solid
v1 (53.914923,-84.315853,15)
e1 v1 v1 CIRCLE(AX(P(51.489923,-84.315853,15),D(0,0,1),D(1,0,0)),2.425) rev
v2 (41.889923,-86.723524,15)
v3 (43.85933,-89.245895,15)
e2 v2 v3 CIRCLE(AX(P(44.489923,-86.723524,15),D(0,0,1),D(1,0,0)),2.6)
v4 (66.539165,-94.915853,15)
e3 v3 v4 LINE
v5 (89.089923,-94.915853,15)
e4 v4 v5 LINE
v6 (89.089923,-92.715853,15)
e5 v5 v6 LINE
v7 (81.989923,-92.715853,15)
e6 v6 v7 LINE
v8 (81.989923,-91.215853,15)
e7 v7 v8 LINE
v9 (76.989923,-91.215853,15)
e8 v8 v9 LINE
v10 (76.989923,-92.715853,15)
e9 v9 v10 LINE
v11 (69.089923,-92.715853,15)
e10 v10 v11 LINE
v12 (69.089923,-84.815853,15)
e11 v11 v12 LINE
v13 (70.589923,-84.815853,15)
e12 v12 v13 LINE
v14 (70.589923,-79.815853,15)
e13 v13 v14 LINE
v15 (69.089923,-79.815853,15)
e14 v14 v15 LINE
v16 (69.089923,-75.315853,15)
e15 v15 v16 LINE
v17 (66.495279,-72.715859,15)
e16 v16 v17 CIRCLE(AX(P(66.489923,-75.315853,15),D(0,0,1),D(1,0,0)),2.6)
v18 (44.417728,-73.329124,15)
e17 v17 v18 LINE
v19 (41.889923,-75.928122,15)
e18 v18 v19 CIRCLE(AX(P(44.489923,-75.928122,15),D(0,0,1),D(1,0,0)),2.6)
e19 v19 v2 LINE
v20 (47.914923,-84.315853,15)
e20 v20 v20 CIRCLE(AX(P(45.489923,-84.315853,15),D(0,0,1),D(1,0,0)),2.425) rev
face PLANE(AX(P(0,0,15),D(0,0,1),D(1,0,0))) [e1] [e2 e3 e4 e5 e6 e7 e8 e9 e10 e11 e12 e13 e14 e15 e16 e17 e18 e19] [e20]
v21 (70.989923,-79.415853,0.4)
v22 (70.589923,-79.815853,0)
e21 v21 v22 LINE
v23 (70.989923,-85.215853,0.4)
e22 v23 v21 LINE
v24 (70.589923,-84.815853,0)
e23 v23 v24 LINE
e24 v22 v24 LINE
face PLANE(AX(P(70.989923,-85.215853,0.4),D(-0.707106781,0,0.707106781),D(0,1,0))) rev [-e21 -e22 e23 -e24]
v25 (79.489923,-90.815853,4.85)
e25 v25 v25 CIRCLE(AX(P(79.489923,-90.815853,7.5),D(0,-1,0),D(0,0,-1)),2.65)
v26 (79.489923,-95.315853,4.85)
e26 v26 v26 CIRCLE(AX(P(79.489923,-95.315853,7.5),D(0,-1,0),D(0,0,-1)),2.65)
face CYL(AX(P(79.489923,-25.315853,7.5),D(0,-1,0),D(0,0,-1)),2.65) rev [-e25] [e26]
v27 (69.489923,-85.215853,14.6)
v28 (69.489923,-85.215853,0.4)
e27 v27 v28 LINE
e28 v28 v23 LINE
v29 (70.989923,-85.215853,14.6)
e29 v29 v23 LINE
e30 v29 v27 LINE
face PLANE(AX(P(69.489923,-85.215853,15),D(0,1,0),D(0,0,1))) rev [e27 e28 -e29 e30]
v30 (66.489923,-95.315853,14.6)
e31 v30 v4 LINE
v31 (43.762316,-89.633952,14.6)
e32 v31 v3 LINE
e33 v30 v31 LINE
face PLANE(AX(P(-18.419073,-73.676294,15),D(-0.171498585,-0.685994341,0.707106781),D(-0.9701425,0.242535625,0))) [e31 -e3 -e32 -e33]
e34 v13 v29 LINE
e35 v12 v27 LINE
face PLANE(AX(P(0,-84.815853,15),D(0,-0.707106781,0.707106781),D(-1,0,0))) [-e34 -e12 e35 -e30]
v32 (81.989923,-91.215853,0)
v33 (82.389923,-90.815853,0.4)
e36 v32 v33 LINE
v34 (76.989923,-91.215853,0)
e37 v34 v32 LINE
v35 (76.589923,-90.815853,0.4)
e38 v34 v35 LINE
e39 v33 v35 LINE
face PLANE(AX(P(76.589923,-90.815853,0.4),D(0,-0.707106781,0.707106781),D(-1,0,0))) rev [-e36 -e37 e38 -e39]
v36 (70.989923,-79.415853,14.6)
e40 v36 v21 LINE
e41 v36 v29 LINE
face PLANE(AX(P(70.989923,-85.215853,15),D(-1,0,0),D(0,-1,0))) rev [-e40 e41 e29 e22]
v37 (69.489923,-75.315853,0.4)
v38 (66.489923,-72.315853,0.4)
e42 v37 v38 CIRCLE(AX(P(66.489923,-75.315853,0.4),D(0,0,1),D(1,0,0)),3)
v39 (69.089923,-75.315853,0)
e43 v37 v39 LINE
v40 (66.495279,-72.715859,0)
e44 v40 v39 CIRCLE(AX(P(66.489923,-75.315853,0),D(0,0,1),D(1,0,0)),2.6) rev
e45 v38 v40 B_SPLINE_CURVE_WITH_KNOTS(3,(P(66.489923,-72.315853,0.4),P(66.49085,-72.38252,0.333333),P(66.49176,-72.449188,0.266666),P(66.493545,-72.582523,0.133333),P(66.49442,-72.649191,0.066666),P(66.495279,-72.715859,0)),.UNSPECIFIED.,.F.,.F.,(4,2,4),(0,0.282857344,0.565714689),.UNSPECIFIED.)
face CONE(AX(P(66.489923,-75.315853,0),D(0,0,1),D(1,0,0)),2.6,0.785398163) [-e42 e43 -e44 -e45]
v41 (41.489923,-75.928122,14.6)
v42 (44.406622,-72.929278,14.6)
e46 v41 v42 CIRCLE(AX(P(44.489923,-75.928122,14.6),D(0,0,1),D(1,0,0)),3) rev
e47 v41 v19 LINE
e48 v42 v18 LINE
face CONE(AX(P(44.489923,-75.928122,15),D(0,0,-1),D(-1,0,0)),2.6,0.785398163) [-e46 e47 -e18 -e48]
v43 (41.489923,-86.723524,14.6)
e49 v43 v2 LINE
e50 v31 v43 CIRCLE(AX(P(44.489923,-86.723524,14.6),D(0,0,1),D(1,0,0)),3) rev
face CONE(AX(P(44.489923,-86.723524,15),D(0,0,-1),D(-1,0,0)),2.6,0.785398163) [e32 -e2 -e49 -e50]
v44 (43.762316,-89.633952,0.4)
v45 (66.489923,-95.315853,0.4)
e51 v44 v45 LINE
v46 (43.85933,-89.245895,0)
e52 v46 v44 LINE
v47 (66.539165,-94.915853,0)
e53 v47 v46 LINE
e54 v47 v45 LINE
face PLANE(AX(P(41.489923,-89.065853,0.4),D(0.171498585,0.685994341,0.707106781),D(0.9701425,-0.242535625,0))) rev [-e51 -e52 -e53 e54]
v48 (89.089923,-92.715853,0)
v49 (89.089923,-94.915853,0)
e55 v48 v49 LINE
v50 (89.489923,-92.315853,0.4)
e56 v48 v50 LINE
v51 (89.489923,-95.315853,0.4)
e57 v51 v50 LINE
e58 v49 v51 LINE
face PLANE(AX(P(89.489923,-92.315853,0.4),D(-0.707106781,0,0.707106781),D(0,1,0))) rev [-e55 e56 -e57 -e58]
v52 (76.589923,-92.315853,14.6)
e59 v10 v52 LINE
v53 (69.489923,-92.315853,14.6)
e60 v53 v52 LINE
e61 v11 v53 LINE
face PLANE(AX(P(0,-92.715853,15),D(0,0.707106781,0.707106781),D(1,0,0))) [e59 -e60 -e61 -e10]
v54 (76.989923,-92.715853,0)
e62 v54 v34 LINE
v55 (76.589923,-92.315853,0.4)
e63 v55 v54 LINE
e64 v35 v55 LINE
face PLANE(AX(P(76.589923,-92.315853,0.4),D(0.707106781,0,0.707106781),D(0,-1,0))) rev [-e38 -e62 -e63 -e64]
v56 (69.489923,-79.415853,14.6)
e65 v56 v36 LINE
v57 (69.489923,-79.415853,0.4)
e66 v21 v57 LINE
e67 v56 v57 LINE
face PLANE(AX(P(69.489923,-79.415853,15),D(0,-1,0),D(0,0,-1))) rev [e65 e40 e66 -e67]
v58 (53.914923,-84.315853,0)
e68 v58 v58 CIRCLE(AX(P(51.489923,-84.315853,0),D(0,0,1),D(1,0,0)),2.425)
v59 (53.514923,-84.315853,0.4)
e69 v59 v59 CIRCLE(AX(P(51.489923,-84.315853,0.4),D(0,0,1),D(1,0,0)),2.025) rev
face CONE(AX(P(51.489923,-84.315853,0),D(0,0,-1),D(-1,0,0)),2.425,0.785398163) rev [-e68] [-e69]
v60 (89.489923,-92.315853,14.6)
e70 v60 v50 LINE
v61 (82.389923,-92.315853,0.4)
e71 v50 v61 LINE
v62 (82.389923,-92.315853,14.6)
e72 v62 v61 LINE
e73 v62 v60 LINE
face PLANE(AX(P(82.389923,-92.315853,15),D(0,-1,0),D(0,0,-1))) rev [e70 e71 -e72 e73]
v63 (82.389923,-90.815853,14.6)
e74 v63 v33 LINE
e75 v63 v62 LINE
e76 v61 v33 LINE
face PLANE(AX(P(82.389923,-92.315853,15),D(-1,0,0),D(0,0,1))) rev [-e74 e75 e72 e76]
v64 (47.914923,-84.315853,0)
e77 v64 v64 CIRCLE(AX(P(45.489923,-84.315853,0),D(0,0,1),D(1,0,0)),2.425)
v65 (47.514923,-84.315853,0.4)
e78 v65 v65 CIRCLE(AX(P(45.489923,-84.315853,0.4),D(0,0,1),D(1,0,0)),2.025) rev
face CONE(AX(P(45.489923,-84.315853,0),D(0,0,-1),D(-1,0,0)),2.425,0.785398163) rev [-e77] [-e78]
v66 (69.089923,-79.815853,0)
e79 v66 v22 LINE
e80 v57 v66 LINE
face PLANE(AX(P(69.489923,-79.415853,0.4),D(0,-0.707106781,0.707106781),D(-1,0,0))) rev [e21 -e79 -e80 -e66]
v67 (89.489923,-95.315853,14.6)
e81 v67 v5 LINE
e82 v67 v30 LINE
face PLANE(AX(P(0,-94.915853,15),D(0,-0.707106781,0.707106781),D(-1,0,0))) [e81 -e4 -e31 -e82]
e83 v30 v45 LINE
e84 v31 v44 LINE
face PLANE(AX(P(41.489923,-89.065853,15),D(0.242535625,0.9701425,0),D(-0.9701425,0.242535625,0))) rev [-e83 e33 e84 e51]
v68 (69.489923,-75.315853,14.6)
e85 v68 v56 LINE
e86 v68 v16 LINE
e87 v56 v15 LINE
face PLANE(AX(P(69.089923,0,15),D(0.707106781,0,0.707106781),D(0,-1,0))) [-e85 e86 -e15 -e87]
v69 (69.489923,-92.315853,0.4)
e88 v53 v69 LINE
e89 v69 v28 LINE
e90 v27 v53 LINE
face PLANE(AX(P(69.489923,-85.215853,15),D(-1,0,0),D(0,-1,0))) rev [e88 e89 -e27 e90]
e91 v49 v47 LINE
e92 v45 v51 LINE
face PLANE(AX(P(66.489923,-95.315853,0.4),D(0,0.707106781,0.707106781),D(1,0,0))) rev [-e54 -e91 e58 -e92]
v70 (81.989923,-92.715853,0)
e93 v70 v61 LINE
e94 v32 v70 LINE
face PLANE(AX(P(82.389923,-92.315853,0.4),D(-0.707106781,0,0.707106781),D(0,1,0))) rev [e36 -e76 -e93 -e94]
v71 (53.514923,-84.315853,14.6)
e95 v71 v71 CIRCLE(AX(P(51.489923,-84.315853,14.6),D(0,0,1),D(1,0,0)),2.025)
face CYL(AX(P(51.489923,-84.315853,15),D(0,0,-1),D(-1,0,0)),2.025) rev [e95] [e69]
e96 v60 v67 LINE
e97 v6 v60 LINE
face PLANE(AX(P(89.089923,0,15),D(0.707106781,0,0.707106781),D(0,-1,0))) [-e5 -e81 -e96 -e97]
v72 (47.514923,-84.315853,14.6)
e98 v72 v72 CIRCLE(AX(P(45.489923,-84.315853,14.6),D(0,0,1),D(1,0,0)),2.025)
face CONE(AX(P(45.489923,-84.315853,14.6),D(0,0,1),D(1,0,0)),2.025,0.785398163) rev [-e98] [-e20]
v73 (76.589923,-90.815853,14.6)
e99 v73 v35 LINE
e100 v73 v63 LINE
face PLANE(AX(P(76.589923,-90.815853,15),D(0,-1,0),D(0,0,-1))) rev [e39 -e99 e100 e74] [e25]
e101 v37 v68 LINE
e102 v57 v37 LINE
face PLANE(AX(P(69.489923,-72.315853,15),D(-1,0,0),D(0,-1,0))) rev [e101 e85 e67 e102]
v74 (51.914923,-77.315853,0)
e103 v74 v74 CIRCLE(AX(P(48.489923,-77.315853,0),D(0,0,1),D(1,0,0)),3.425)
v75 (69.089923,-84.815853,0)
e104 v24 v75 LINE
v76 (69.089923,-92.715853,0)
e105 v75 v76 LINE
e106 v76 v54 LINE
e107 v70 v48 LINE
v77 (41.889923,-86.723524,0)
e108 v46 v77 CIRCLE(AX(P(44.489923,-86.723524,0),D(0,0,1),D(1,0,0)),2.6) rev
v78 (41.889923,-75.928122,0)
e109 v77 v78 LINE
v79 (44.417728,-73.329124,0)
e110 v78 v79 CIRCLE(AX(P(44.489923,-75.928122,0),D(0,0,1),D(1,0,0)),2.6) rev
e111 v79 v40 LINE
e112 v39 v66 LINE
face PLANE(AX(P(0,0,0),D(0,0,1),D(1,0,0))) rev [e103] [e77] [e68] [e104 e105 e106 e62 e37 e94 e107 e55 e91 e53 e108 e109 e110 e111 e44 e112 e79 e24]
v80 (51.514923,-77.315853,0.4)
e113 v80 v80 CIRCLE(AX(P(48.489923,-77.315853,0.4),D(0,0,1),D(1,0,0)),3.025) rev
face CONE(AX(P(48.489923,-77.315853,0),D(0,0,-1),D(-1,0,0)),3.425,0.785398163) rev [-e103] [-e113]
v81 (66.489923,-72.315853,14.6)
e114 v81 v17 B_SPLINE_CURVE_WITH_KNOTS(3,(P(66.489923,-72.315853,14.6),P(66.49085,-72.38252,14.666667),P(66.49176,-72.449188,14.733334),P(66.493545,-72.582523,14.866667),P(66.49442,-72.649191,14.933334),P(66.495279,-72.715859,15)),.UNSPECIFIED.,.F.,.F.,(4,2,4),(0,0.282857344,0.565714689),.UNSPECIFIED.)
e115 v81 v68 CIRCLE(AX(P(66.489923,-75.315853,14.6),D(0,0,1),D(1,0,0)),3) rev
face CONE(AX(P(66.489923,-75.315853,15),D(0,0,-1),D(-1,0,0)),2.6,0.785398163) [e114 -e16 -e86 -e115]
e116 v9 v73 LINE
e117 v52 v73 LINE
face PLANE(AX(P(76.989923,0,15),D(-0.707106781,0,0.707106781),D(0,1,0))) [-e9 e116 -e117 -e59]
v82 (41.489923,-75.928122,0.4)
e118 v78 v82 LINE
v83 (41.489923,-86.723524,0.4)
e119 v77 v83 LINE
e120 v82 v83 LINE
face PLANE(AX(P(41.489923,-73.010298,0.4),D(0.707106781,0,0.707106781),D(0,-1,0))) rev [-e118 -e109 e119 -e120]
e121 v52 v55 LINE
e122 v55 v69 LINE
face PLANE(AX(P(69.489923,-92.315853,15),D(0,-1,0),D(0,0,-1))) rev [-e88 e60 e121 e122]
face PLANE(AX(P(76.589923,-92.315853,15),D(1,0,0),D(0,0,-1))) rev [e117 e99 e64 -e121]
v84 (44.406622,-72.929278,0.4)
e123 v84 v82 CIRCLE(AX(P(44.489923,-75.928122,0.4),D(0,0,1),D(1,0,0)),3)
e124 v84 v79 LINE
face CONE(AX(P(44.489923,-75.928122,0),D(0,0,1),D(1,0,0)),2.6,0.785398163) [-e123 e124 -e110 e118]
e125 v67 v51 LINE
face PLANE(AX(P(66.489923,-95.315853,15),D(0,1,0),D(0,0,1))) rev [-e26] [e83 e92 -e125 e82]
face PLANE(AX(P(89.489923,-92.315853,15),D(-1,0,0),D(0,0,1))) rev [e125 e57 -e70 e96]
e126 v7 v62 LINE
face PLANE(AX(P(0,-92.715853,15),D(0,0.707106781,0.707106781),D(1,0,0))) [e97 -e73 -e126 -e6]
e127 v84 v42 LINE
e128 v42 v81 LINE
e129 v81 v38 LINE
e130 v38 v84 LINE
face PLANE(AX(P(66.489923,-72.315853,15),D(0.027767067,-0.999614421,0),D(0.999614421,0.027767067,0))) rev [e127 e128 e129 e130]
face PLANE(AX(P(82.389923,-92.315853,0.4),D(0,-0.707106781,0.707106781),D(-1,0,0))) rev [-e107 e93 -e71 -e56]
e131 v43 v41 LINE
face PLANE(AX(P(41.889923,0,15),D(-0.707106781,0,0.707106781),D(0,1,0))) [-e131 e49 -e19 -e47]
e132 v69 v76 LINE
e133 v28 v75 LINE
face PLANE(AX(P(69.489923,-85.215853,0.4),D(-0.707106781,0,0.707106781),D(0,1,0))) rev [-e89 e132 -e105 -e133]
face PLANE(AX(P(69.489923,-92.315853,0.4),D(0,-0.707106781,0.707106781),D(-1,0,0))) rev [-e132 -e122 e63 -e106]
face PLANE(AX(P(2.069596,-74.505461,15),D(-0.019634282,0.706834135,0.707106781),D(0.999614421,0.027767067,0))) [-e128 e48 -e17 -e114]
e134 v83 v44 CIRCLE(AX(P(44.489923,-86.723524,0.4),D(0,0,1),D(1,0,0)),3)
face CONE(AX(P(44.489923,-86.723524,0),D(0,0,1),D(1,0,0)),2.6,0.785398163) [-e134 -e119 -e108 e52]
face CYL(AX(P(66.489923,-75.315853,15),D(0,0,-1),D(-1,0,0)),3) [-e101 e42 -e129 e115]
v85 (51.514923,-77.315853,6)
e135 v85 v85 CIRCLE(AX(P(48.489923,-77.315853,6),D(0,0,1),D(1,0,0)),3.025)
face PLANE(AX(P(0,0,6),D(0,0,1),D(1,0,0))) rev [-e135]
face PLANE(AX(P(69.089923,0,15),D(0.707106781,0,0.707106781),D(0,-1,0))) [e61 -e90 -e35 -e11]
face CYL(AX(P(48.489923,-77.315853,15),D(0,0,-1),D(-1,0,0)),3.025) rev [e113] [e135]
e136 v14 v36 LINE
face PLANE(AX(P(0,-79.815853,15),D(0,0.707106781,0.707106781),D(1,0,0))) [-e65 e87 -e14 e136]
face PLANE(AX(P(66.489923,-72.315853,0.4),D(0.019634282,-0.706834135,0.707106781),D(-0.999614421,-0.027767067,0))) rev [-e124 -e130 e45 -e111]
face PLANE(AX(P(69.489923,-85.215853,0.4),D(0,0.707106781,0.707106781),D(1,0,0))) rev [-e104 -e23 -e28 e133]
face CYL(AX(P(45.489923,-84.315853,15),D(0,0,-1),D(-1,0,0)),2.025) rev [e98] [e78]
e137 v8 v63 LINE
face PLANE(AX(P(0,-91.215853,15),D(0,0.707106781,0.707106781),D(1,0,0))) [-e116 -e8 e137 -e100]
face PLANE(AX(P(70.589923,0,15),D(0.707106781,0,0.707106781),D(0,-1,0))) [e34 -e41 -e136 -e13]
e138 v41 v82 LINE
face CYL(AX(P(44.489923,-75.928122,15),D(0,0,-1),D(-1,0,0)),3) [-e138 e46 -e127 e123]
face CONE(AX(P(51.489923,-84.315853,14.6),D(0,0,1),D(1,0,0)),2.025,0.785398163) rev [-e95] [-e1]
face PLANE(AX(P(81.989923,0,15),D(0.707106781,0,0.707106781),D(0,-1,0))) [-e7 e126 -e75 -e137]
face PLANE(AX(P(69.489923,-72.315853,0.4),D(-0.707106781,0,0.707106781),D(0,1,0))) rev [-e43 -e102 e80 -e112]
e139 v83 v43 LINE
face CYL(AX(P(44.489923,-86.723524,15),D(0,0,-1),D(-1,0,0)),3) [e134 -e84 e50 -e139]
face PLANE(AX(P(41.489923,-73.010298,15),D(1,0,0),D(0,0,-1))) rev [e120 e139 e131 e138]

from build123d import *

# Parameters (mm, degrees)
SKETCH1_R           = 3.025
SKETCH1_R_2         = 2.025
BOSS_EXTRUDE1_DEPTH = 15
BOSS_EXTRUDE2_START = 6
SKETCH1_2_R         = 3.025
BOSS_EXTRUDE2_DEPTH = 9
SKETCH2_R           = 2.65
CUT_EXTRUDE1_DEPTH  = 70
FILLET1_R           = 3
CHAMFER1_SIZE       = 0.4


# Some blends are built 0.0001 mm under size
with BuildPart() as part:
    # Sketch1 → Boss-Extrude1 (new body)
    with BuildSketch(Plane.XY):
        Polygon((66.489922843, -72.31585339), (69.489922843, -72.31585339), (69.489922843, -79.41585339), (70.989922843, -79.41585339), (70.989922843, -85.21585339), (69.489922843, -85.21585339), (69.489922843, -92.31585339), (76.589922843, -92.31585339), (76.589922843, -90.81585339), (82.389922843, -90.81585339), (82.389922843, -92.31585339), (89.489922843, -92.31585339), (89.489922843, -95.31585339), (66.489922843, -95.31585339), (41.489922843, -89.06585339), (41.489922843, -73.010297834), align=None)
        with Locations((48.489922843, -77.31585339)):
            Circle(SKETCH1_R, mode=Mode.SUBTRACT)
        with Locations((45.489922843, -84.31585339)):
            Circle(SKETCH1_R_2, mode=Mode.SUBTRACT)
        with Locations((51.489922843, -84.31585339)):
            Circle(SKETCH1_R_2, mode=Mode.SUBTRACT)
    extrude(amount=BOSS_EXTRUDE1_DEPTH)

    # Sketch1<2> → Boss-Extrude2 (add)
    with BuildSketch(Plane.XY.offset(BOSS_EXTRUDE2_START)):
        with Locations((48.489922843, -77.31585339)):
            Circle(SKETCH1_2_R)
    extrude(amount=BOSS_EXTRUDE2_DEPTH)

    # Sketch2 → Cut-Extrude1 (cut)
    with BuildSketch(Plane.XZ.offset(95.31585339)):
        with Locations(Location((79.489922843, 7.5, 0), (0, 0, 270))):
            Circle(SKETCH2_R)
    extrude(amount=-CUT_EXTRUDE1_DEPTH, mode=Mode.SUBTRACT)

    # Fillet1
    fillet1_edges = [part.edges().sort_by_distance(p)[0] for p in [
        (69.489922843, -72.31585339, 7.5),
        (41.489922843, -73.010297834, 7.5),
        (41.489922843, -89.06585339, 7.5),
    ]]
    fillet(fillet1_edges, radius=FILLET1_R - 0.0001)  # a hair under: the kernel refuses the full size

    # Chamfer1
    # the kernel refuses this chamfer: 0.4 mm, written as the material it takes off along each edge
    with BuildSketch(Plane(origin=(69.489922843, -75.31575339, 0), x_dir=(-0.9996219169112966, 2.140826135148345e-13, -0.027495876610585536), z_dir=(0, -1, 0))) as chamfer1_piece_1:
        Polygon((CHAMFER1_SIZE * 0.999621916911, -CHAMFER1_SIZE * 0.0274958766106), (-CHAMFER1_SIZE * 0.0274958766106, -CHAMFER1_SIZE * 0.999621916911), (0, 0), align=None)
    extrude(amount=4.1001, mode=Mode.SUBTRACT)
    with BuildSketch(Plane(origin=(69.489922843, -79.41585339, 0), x_dir=(0, -0.9996219169112966, -0.027495876610585536), z_dir=(1, 0, 0)), Plane(origin=(72.018596038, -85.21585339, 0), x_dir=(0, 0.9996219169112966, -0.027495876610585536), z_dir=(-1, 0, 0)), Plane(origin=(76.589922843, -92.31585339, 0), x_dir=(0.9996219169112966, 0, -0.027495876610585536), z_dir=(0, 1, 0)), Plane(origin=(82.389922843, -89.787180195, 0), x_dir=(-0.9996219169112966, 0, -0.027495876610585536), z_dir=(0, -1, 0))) as chamfer1_piece_2:
        Polygon((CHAMFER1_SIZE * 0.999621916911, -CHAMFER1_SIZE * 0.0274958766106), (-CHAMFER1_SIZE * 0.0274958766106, -CHAMFER1_SIZE * 0.999621916911), (0, 0), align=None)
    extrude(amount=2.528673195, mode=Mode.SUBTRACT)
    with BuildSketch(Plane(origin=(90.518596038, -95.31585339, 15), x_dir=(0, 0.9996219169112966, 0.02749587661058671), z_dir=(-1, 0, 0))) as chamfer1_piece_3:
        Polygon((CHAMFER1_SIZE * 0.999621916911, CHAMFER1_SIZE * 0.0274958766106), (-CHAMFER1_SIZE * 0.0274958766106, CHAMFER1_SIZE * 0.999621916911), (0, 0), align=None)
    extrude(amount=25.05734639, mode=Mode.SUBTRACT)
    with BuildSketch(Plane(origin=(70.989922843, -78.387180195, 0), x_dir=(-0.9996219169112966, -2.6206664757850423e-13, -0.027495876610585536), z_dir=(0, -1, 0)), Plane(origin=(75.561249648, -90.81585339, 0), x_dir=(0, -0.9996219169112966, -0.027495876610585536), z_dir=(1, 0, 0))) as chamfer1_piece_4:
        Polygon((CHAMFER1_SIZE * 0.999621916911, -CHAMFER1_SIZE * 0.0274958766106), (-CHAMFER1_SIZE * 0.0274958766106, -CHAMFER1_SIZE * 0.999621916911), (0, 0), align=None)
    extrude(amount=7.85734639, mode=Mode.SUBTRACT)
    with BuildSketch(Plane(origin=(69.489922843, -85.21585339, 0), x_dir=(-0.9996219169112966, -2.1408261351483406e-13, -0.027495876610585536), z_dir=(0, -1, 0)), Plane(origin=(69.489922843, -92.31585339, 0), x_dir=(0, -0.9996219169112966, -0.027495876610585536), z_dir=(1, 0, 0))) as chamfer1_piece_5:
        Polygon((CHAMFER1_SIZE * 0.999621916911, -CHAMFER1_SIZE * 0.0274958766106), (-CHAMFER1_SIZE * 0.0274958766106, -CHAMFER1_SIZE * 0.999621916911), (0, 0), align=None)
    extrude(amount=7.1, mode=Mode.SUBTRACT)
    with BuildSketch(Plane(origin=(82.389922843, -92.31585339, 0), x_dir=(0, -0.9996219169112966, -0.027495876610585536), z_dir=(1, 0, 0))) as chamfer1_piece_6:
        Polygon((CHAMFER1_SIZE * 0.999621916911, -CHAMFER1_SIZE * 0.0274958766106), (-CHAMFER1_SIZE * 0.0274958766106, -CHAMFER1_SIZE * 0.999621916911), (0, 0), align=None)
    extrude(amount=8.128673195, mode=Mode.SUBTRACT)
    with BuildSketch(Plane(origin=(89.489922843, -91.287180195, 0), x_dir=(-0.9996219169112966, 0, -0.027495876610585536), z_dir=(0, -1, 0))) as chamfer1_piece_7:
        Polygon((CHAMFER1_SIZE * 0.999621916911, -CHAMFER1_SIZE * 0.0274958766106), (-CHAMFER1_SIZE * 0.0274958766106, -CHAMFER1_SIZE * 0.999621916911), (0, 0), align=None)
    extrude(amount=5.05734639, mode=Mode.SUBTRACT)
    with BuildSketch(Plane(origin=(90.518596038, -95.31585339, 0), x_dir=(0, 0.9996219169112966, -0.027495876610585536), z_dir=(-1, 0, 0))) as chamfer1_piece_8:
        Polygon((CHAMFER1_SIZE * 0.999621916911, -CHAMFER1_SIZE * 0.0274958766106), (-CHAMFER1_SIZE * 0.0274958766106, -CHAMFER1_SIZE * 0.999621916911), (0, 0), align=None)
    extrude(amount=25.05734639, mode=Mode.SUBTRACT)
    with BuildSketch(Plane(origin=(89.489922843, -91.287180195, 15), x_dir=(-0.9996219169112966, 0, 0.02749587661058671), z_dir=(0, -1, 0))) as chamfer1_piece_9:
        Polygon((CHAMFER1_SIZE * 0.999621916911, CHAMFER1_SIZE * 0.0274958766106), (-CHAMFER1_SIZE * 0.0274958766106, CHAMFER1_SIZE * 0.999621916911), (0, 0), align=None)
    extrude(amount=5.05734639, mode=Mode.SUBTRACT)
    with BuildSketch(Plane(origin=(44.406524418, -72.929281124, 0), x_dir=(0.02775656898180667, -0.9992364833450456, -0.027495876610586712), z_dir=(0.9996144206527183, 0.027767067240353136, 0)), Plane(origin=(44.406524418, -72.929281124, 15), x_dir=(-0.0007634798546782339, 0.027485274768416574, -0.9996219169112971), z_dir=(0.9996144206527183, 0.027767067240353136, 0))) as chamfer1_piece_10:
        Polygon((CHAMFER1_SIZE * 0.999621916911, -CHAMFER1_SIZE * 0.0274958766106), (-CHAMFER1_SIZE * 0.0274958766106, -CHAMFER1_SIZE * 0.999621916911), (0, 0), align=None)
    extrude(amount=23.120589807, mode=Mode.SUBTRACT)
    with BuildSketch(Plane(origin=(82.389922843, -92.31585339, 15), x_dir=(0, -0.9996219169112966, 0.02749587661058671), z_dir=(1, 0, 0))) as chamfer1_piece_11:
        Polygon((CHAMFER1_SIZE * 0.999621916911, CHAMFER1_SIZE * 0.0274958766106), (-CHAMFER1_SIZE * 0.0274958766106, CHAMFER1_SIZE * 0.999621916911), (0, 0), align=None)
    extrude(amount=8.128673195, mode=Mode.SUBTRACT)
    with BuildSketch(Plane(origin=(82.389922843, -89.787180195, 15), x_dir=(-0.9996219169112966, 0, 0.02749587661058671), z_dir=(0, -1, 0)), Plane(origin=(76.589922843, -92.31585339, 15), x_dir=(0.9996219169112966, 0, 0.02749587661058671), z_dir=(0, 1, 0)), Plane(origin=(72.018596038, -85.21585339, 15), x_dir=(0, 0.9996219169112966, 0.02749587661058671), z_dir=(-1, 0, 0)), Plane(origin=(69.489922843, -79.41585339, 15), x_dir=(0, -0.9996219169112966, 0.02749587661058671), z_dir=(1, 0, 0))) as chamfer1_piece_12:
        Polygon((CHAMFER1_SIZE * 0.999621916911, CHAMFER1_SIZE * 0.0274958766106), (-CHAMFER1_SIZE * 0.0274958766106, CHAMFER1_SIZE * 0.999621916911), (0, 0), align=None)
    extrude(amount=2.528673195, mode=Mode.SUBTRACT)
    with BuildSketch(Plane(origin=(75.561249648, -90.81585339, 15), x_dir=(0, -0.9996219169112966, 0.02749587661058671), z_dir=(1, 0, 0)), Plane(origin=(70.989922843, -78.387180195, 15), x_dir=(-0.9996219169112966, -2.6206664757850423e-13, 0.02749587661058671), z_dir=(0, -1, 0))) as chamfer1_piece_13:
        Polygon((CHAMFER1_SIZE * 0.999621916911, CHAMFER1_SIZE * 0.0274958766106), (-CHAMFER1_SIZE * 0.0274958766106, CHAMFER1_SIZE * 0.999621916911), (0, 0), align=None)
    extrude(amount=7.85734639, mode=Mode.SUBTRACT)
    with BuildSketch(Plane(origin=(48.489922843, -77.31585339, 0), x_dir=(1, 0, 0), z_dir=(0, -1, 0))) as chamfer1_piece_14:
        Polygon((3.025 + CHAMFER1_SIZE, 0), (3.025, CHAMFER1_SIZE), (3.025, 0), align=None)
    revolve(axis=Axis((48.489922843, -77.31585339, 0), (0, 0, 1)), mode=Mode.SUBTRACT)
    with BuildSketch(Plane(origin=(69.489922843, -92.31585339, 15), x_dir=(0, -0.9996219169112966, 0.02749587661058671), z_dir=(1, 0, 0)), Plane(origin=(69.489922843, -85.21585339, 15), x_dir=(-0.9996219169112966, -2.1408261351483406e-13, 0.02749587661058671), z_dir=(0, -1, 0))) as chamfer1_piece_15:
        Polygon((CHAMFER1_SIZE * 0.999621916911, CHAMFER1_SIZE * 0.0274958766106), (-CHAMFER1_SIZE * 0.0274958766106, CHAMFER1_SIZE * 0.999621916911), (0, 0), align=None)
    extrude(amount=7.1, mode=Mode.SUBTRACT)
    with BuildSketch(Plane(origin=(45.489922843, -84.31585339, 0), x_dir=(1, 0, 0), z_dir=(0, -1, 0))) as chamfer1_piece_16:
        Polygon((2.025 + CHAMFER1_SIZE, 0), (2.025, CHAMFER1_SIZE), (2.025, 0), align=None)
    revolve(axis=Axis((45.489922843, -84.31585339, 0), (0, 0, 1)), mode=Mode.SUBTRACT)
    with BuildSketch(Plane(origin=(45.489922843, -84.31585339, 15), x_dir=(1, 0, 0), z_dir=(0, -1, 0))) as chamfer1_piece_17:
        Polygon((2.025 + CHAMFER1_SIZE, 0), (2.025, -CHAMFER1_SIZE), (2.025, 0), align=None)
    revolve(axis=Axis((45.489922843, -84.31585339, 15), (0, 0, 1)), mode=Mode.SUBTRACT)
    with BuildSketch(Plane(origin=(51.489922843, -84.31585339, 0), x_dir=(1, 0, 0), z_dir=(0, -1, 0))) as chamfer1_piece_18:
        Polygon((2.025 + CHAMFER1_SIZE, 0), (2.025, CHAMFER1_SIZE), (2.025, 0), align=None)
    revolve(axis=Axis((51.489922843, -84.31585339, 0), (0, 0, 1)), mode=Mode.SUBTRACT)
    with BuildSketch(Plane(origin=(51.489922843, -84.31585339, 15), x_dir=(1, 0, 0), z_dir=(0, -1, 0))) as chamfer1_piece_19:
        Polygon((2.025 + CHAMFER1_SIZE, 0), (2.025, -CHAMFER1_SIZE), (2.025, 0), align=None)
    revolve(axis=Axis((51.489922843, -84.31585339, 15), (0, 0, 1)), mode=Mode.SUBTRACT)
    with BuildSketch(Plane(origin=(69.489922843, -75.31575339, 15), x_dir=(-0.9996219169112966, 2.140826135148345e-13, 0.02749587661058671), z_dir=(0, -1, 0))) as chamfer1_piece_20:
        Polygon((CHAMFER1_SIZE * 0.999621916911, CHAMFER1_SIZE * 0.0274958766106), (-CHAMFER1_SIZE * 0.0274958766106, CHAMFER1_SIZE * 0.999621916911), (0, 0), align=None)
    extrude(amount=4.1001, mode=Mode.SUBTRACT)
    with BuildSketch(Plane(origin=(67.487882428, -95.565343286, 0), x_dir=(0.2424439264180973, 0.969775705672395, -0.02749587661058577), z_dir=(-0.9701425001453322, 0.2425356250363316, 0))) as chamfer1_piece_21:
        Polygon((CHAMFER1_SIZE * 0.999621916911, -CHAMFER1_SIZE * 0.0274958766106), (-CHAMFER1_SIZE * 0.0274958766106, -CHAMFER1_SIZE * 0.999621916911), (0, 0), align=None)
    extrude(amount=24.455832214, mode=Mode.SUBTRACT)
    with BuildSketch(Plane(origin=(41.489922843, -86.723602248, 0), x_dir=(0.9996219169112968, 0, -0.02749587661058673), z_dir=(0, 1, 0))) as chamfer1_piece_22:
        Polygon((CHAMFER1_SIZE * 0.999621916911, -CHAMFER1_SIZE * 0.0274958766106), (-CHAMFER1_SIZE * 0.0274958766106, -CHAMFER1_SIZE * 0.999621916911), (0, 0), align=None)
    extrude(amount=10.795577824, mode=Mode.SUBTRACT)
    with BuildSketch(Plane(origin=(44.489822843, -86.723602248, 0), x_dir=(-1, 0, 0), z_dir=(0, 1, 0))) as chamfer1_piece_23:
        Polygon((2.9999 - CHAMFER1_SIZE, 0), (2.9999, CHAMFER1_SIZE), (2.9999, 0), align=None)
    revolve(axis=Axis((44.489822843, -86.723602248, 0), (0, 0, 1)), revolution_arc=75.963756532, mode=Mode.SUBTRACT)
    with BuildSketch(Plane(origin=(44.489822843, -75.928024424, 0), x_dir=(-0.02776706724035276, 0.9996144206527183, 0), z_dir=(0.9996144206527183, 0.02776706724035276, 0))) as chamfer1_piece_24:
        Polygon((2.9999 - CHAMFER1_SIZE, 0), (2.9999, CHAMFER1_SIZE), (2.9999, 0), align=None)
    revolve(axis=Axis((44.489822843, -75.928024424, 0), (0, 0, 1)), revolution_arc=88.408859729, mode=Mode.SUBTRACT)
    with BuildSketch(Plane(origin=(66.490022843, -75.31575339, 0), x_dir=(0, 1, 0), z_dir=(-1, 0, 0))) as chamfer1_piece_25:
        Polygon((2.9999 - CHAMFER1_SIZE, 0), (2.9999, -CHAMFER1_SIZE), (2.9999, 0), align=None)
    revolve(axis=Axis((66.490022843, -75.31575339, 0), (0, 0, -1)), revolution_arc=90, mode=Mode.SUBTRACT)
    with BuildSketch(Plane(origin=(41.489922843, -86.723602248, 15), x_dir=(0.9996219169112966, 0, 0.027495876610587656), z_dir=(0, 1, 0))) as chamfer1_piece_26:
        Polygon((CHAMFER1_SIZE * 0.999621916911, CHAMFER1_SIZE * 0.0274958766106), (-CHAMFER1_SIZE * 0.0274958766106, CHAMFER1_SIZE * 0.999621916911), (0, 0), align=None)
    extrude(amount=10.795577824, mode=Mode.SUBTRACT)
    with BuildSketch(Plane(origin=(67.487882428, -95.565343286, 15), x_dir=(0.24244392641809726, 0.9697757056723949, 0.027495876610587038), z_dir=(-0.9701425001453322, 0.2425356250363316, 0))) as chamfer1_piece_27:
        Polygon((CHAMFER1_SIZE * 0.999621916911, CHAMFER1_SIZE * 0.0274958766106), (-CHAMFER1_SIZE * 0.0274958766106, CHAMFER1_SIZE * 0.999621916911), (0, 0), align=None)
    extrude(amount=24.455832214, mode=Mode.SUBTRACT)
    with BuildSketch(Plane(origin=(44.489822843, -86.723602248, 15), x_dir=(-1, 0, 0), z_dir=(0, 1, 0))) as chamfer1_piece_28:
        Polygon((2.9999 - CHAMFER1_SIZE, 0), (2.9999, -CHAMFER1_SIZE), (2.9999, 0), align=None)
    revolve(axis=Axis((44.489822843, -86.723602248, 15), (0, 0, 1)), revolution_arc=75.963756532, mode=Mode.SUBTRACT)
    with BuildSketch(Plane(origin=(44.489822843, -75.928024424, 15), x_dir=(-0.02776706724035276, 0.9996144206527183, 0), z_dir=(0.9996144206527183, 0.02776706724035276, 0))) as chamfer1_piece_29:
        Polygon((2.9999 - CHAMFER1_SIZE, 0), (2.9999, -CHAMFER1_SIZE), (2.9999, 0), align=None)
    revolve(axis=Axis((44.489822843, -75.928024424, 15), (0, 0, 1)), revolution_arc=88.408859729, mode=Mode.SUBTRACT)
    with BuildSketch(Plane(origin=(66.490022843, -75.31575339, 15), x_dir=(0, 1, 0), z_dir=(-1, 0, 0))) as chamfer1_piece_30:
        Polygon((2.9999, CHAMFER1_SIZE), (2.9999 - CHAMFER1_SIZE, 0), (2.9999, 0), align=None)
    revolve(axis=Axis((66.490022843, -75.31575339, 15), (0, 0, -1)), revolution_arc=90, mode=Mode.SUBTRACT)
    with BuildSketch(Plane(origin=(65.461249648, -72.31585339, 15), x_dir=(0, 0.027495876610595927, -0.9996219169112964), z_dir=(1, 0, 0))) as chamfer1_piece_31:
        Polygon((CHAMFER1_SIZE * 0.999621916911, -CHAMFER1_SIZE * 0.0274958766106), (-CHAMFER1_SIZE * 0.0274958766106, -CHAMFER1_SIZE * 0.999621916911), (0, 0), align=None)
    extrude(amount=1.028773195, mode=Mode.SUBTRACT)
    with BuildSketch(Plane(origin=(65.461249648, -72.31585339, 0), x_dir=(0, 0.027495876610595986, 0.9996219169112965), z_dir=(1, 0, 0))) as chamfer1_piece_32:
        Polygon((CHAMFER1_SIZE * 0.999621916911, CHAMFER1_SIZE * 0.0274958766106), (-CHAMFER1_SIZE * 0.0274958766106, CHAMFER1_SIZE * 0.999621916911), (0, 0), align=None)
    extrude(amount=1.028773195, mode=Mode.SUBTRACT)
    with BuildSketch(Plane(origin=(69.489922843, -75.31575339, 0), x_dir=(-0.9996219169112966, 2.140826135148345e-13, -0.027495876610585536), z_dir=(0, -1, 0))) as chamfer1_piece_33a_section:
        Polygon((CHAMFER1_SIZE * 0.999621916911, -CHAMFER1_SIZE * 0.0274958766106), (-CHAMFER1_SIZE * 0.0274958766106, -CHAMFER1_SIZE * 0.999621916911), (0, 0), align=None)
    chamfer1_piece_33a = extrude(amount=5.128773195, mode=Mode.PRIVATE)
    chamfer1_piece_33a = split(chamfer1_piece_33a, bisect_by=Plane(origin=(69.358005392, -79.41585339, 0.131917451), z_dir=(0, -1, 0)), keep=Keep.TOP, mode=Mode.PRIVATE)
    with BuildSketch(Plane(origin=(68.461249648, -79.41585339, 0), x_dir=(0, -0.9996219169112966, -0.027495876610585536), z_dir=(1, 0, 0))) as chamfer1_piece_33b_section:
        Polygon((CHAMFER1_SIZE * 0.999621916911, -CHAMFER1_SIZE * 0.0274958766106), (-CHAMFER1_SIZE * 0.0274958766106, -CHAMFER1_SIZE * 0.999621916911), (0, 0), align=None)
    chamfer1_piece_33b = extrude(amount=3.55734639, mode=Mode.PRIVATE)
    chamfer1_piece_33b = split(chamfer1_piece_33b, bisect_by=Plane(origin=(69.489922843, -79.54777084, 0.131917451), z_dir=(-1, 0, 0)), keep=Keep.TOP, mode=Mode.PRIVATE)
    chamfer1_piece_33 = chamfer1_piece_33a & chamfer1_piece_33b
    add(chamfer1_piece_33, mode=Mode.SUBTRACT)
    with BuildSketch(Plane(origin=(72.018596038, -85.21585339, 0), x_dir=(0, 0.9996219169112966, -0.027495876610585536), z_dir=(-1, 0, 0))) as chamfer1_piece_34a_section:
        Polygon((CHAMFER1_SIZE * 0.999621916911, -CHAMFER1_SIZE * 0.0274958766106), (-CHAMFER1_SIZE * 0.0274958766106, -CHAMFER1_SIZE * 0.999621916911), (0, 0), align=None)
    chamfer1_piece_34a = extrude(amount=3.55734639, mode=Mode.PRIVATE)
    chamfer1_piece_34a = split(chamfer1_piece_34a, bisect_by=Plane(origin=(69.489922843, -85.083935939, 0.131917451), z_dir=(-1, 0, 0)), keep=Keep.TOP, mode=Mode.PRIVATE)
    with BuildSketch(Plane(origin=(69.489922843, -84.187180195, 0), x_dir=(-0.9996219169112966, -2.1408261351483406e-13, -0.027495876610585536), z_dir=(0, -1, 0))) as chamfer1_piece_34b_section:
        Polygon((CHAMFER1_SIZE * 0.999621916911, -CHAMFER1_SIZE * 0.0274958766106), (-CHAMFER1_SIZE * 0.0274958766106, -CHAMFER1_SIZE * 0.999621916911), (0, 0), align=None)
    chamfer1_piece_34b = extrude(amount=8.128673195, mode=Mode.PRIVATE)
    chamfer1_piece_34b = split(chamfer1_piece_34b, bisect_by=Plane(origin=(69.358005392, -85.21585339, 0.131917451), z_dir=(0, 1, 0)), keep=Keep.TOP, mode=Mode.PRIVATE)
    chamfer1_piece_34 = chamfer1_piece_34a & chamfer1_piece_34b
    add(chamfer1_piece_34, mode=Mode.SUBTRACT)
    with BuildSketch(Plane(origin=(69.489922843, -85.21585339, 0), x_dir=(-0.9996219169112966, -2.1408261351483406e-13, -0.027495876610585536), z_dir=(0, -1, 0))) as chamfer1_piece_35a_section:
        Polygon((CHAMFER1_SIZE * 0.999621916911, -CHAMFER1_SIZE * 0.0274958766106), (-CHAMFER1_SIZE * 0.0274958766106, -CHAMFER1_SIZE * 0.999621916911), (0, 0), align=None)
    chamfer1_piece_35a = extrude(amount=8.128673195, mode=Mode.PRIVATE)
    chamfer1_piece_35a = split(chamfer1_piece_35a, bisect_by=Plane(origin=(69.358005392, -92.31585339, 0.131917451), z_dir=(0, -1, 0)), keep=Keep.TOP, mode=Mode.PRIVATE)
    with BuildSketch(Plane(origin=(68.461249648, -92.31585339, 0), x_dir=(0, -0.9996219169112966, -0.027495876610585536), z_dir=(1, 0, 0))) as chamfer1_piece_35b_section:
        Polygon((CHAMFER1_SIZE * 0.999621916911, -CHAMFER1_SIZE * 0.0274958766106), (-CHAMFER1_SIZE * 0.0274958766106, -CHAMFER1_SIZE * 0.999621916911), (0, 0), align=None)
    chamfer1_piece_35b = extrude(amount=8.128673195, mode=Mode.PRIVATE)
    chamfer1_piece_35b = split(chamfer1_piece_35b, bisect_by=Plane(origin=(69.489922843, -92.44777084, 0.131917451), z_dir=(-1, 0, 0)), keep=Keep.TOP, mode=Mode.PRIVATE)
    chamfer1_piece_35 = chamfer1_piece_35a & chamfer1_piece_35b
    add(chamfer1_piece_35, mode=Mode.SUBTRACT)
    with BuildSketch(Plane(origin=(69.489922843, -92.31585339, 0), x_dir=(0, -0.9996219169112966, -0.027495876610585536), z_dir=(1, 0, 0))) as chamfer1_piece_36a_section:
        Polygon((CHAMFER1_SIZE * 0.999621916911, -CHAMFER1_SIZE * 0.0274958766106), (-CHAMFER1_SIZE * 0.0274958766106, -CHAMFER1_SIZE * 0.999621916911), (0, 0), align=None)
    chamfer1_piece_36a = extrude(amount=8.128673195, mode=Mode.PRIVATE)
    chamfer1_piece_36a = split(chamfer1_piece_36a, bisect_by=Plane(origin=(76.589922843, -92.44777084, 0.131917451), z_dir=(1, 0, 0)), keep=Keep.TOP, mode=Mode.PRIVATE)
    with BuildSketch(Plane(origin=(76.589922843, -93.344526585, 0), x_dir=(0.9996219169112966, 0, -0.027495876610585536), z_dir=(0, 1, 0))) as chamfer1_piece_36b_section:
        Polygon((CHAMFER1_SIZE * 0.999621916911, -CHAMFER1_SIZE * 0.0274958766106), (-CHAMFER1_SIZE * 0.0274958766106, -CHAMFER1_SIZE * 0.999621916911), (0, 0), align=None)
    chamfer1_piece_36b = extrude(amount=3.55734639, mode=Mode.PRIVATE)
    chamfer1_piece_36b = split(chamfer1_piece_36b, bisect_by=Plane(origin=(76.721840294, -92.31585339, 0.131917451), z_dir=(0, -1, 0)), keep=Keep.TOP, mode=Mode.PRIVATE)
    chamfer1_piece_36 = chamfer1_piece_36a & chamfer1_piece_36b
    add(chamfer1_piece_36, mode=Mode.SUBTRACT)
    with BuildSketch(Plane(origin=(81.361249648, -92.31585339, 0), x_dir=(0, -0.9996219169112966, -0.027495876610585536), z_dir=(1, 0, 0))) as chamfer1_piece_37a_section:
        Polygon((CHAMFER1_SIZE * 0.999621916911, -CHAMFER1_SIZE * 0.0274958766106), (-CHAMFER1_SIZE * 0.0274958766106, -CHAMFER1_SIZE * 0.999621916911), (0, 0), align=None)
    chamfer1_piece_37a = extrude(amount=9.15734639, mode=Mode.PRIVATE)
    chamfer1_piece_37a = split(chamfer1_piece_37a, bisect_by=Plane(origin=(82.389922843, -92.44777084, 0.131917451), z_dir=(-1, 0, 0)), keep=Keep.TOP, mode=Mode.PRIVATE)
    with BuildSketch(Plane(origin=(82.389922843, -89.787180195, 0), x_dir=(-0.9996219169112966, 0, -0.027495876610585536), z_dir=(0, -1, 0))) as chamfer1_piece_37b_section:
        Polygon((CHAMFER1_SIZE * 0.999621916911, -CHAMFER1_SIZE * 0.0274958766106), (-CHAMFER1_SIZE * 0.0274958766106, -CHAMFER1_SIZE * 0.999621916911), (0, 0), align=None)
    chamfer1_piece_37b = extrude(amount=3.55734639, mode=Mode.PRIVATE)
    chamfer1_piece_37b = split(chamfer1_piece_37b, bisect_by=Plane(origin=(82.258005392, -92.31585339, 0.131917451), z_dir=(0, -1, 0)), keep=Keep.TOP, mode=Mode.PRIVATE)
    chamfer1_piece_37 = chamfer1_piece_37a & chamfer1_piece_37b
    add(chamfer1_piece_37, mode=Mode.SUBTRACT)
    with BuildSketch(Plane(origin=(81.361249648, -92.31585339, 15), x_dir=(0, -0.9996219169112966, 0.02749587661058671), z_dir=(1, 0, 0))) as chamfer1_piece_38a_section:
        Polygon((CHAMFER1_SIZE * 0.999621916911, CHAMFER1_SIZE * 0.0274958766106), (-CHAMFER1_SIZE * 0.0274958766106, CHAMFER1_SIZE * 0.999621916911), (0, 0), align=None)
    chamfer1_piece_38a = extrude(amount=9.15734639, mode=Mode.PRIVATE)
    chamfer1_piece_38a = split(chamfer1_piece_38a, bisect_by=Plane(origin=(82.389922843, -92.44777084, 14.868082549), z_dir=(-1, 0, 0)), keep=Keep.TOP, mode=Mode.PRIVATE)
    with BuildSketch(Plane(origin=(82.389922843, -89.787180195, 15), x_dir=(-0.9996219169112966, 0, 0.02749587661058671), z_dir=(0, -1, 0))) as chamfer1_piece_38b_section:
        Polygon((CHAMFER1_SIZE * 0.999621916911, CHAMFER1_SIZE * 0.0274958766106), (-CHAMFER1_SIZE * 0.0274958766106, CHAMFER1_SIZE * 0.999621916911), (0, 0), align=None)
    chamfer1_piece_38b = extrude(amount=3.55734639, mode=Mode.PRIVATE)
    chamfer1_piece_38b = split(chamfer1_piece_38b, bisect_by=Plane(origin=(82.258005392, -92.31585339, 14.868082549), z_dir=(0, -1, 0)), keep=Keep.TOP, mode=Mode.PRIVATE)
    chamfer1_piece_38 = chamfer1_piece_38a & chamfer1_piece_38b
    add(chamfer1_piece_38, mode=Mode.SUBTRACT)
    with BuildSketch(Plane(origin=(69.489922843, -92.31585339, 15), x_dir=(0, -0.9996219169112966, 0.02749587661058671), z_dir=(1, 0, 0))) as chamfer1_piece_39a_section:
        Polygon((CHAMFER1_SIZE * 0.999621916911, CHAMFER1_SIZE * 0.0274958766106), (-CHAMFER1_SIZE * 0.0274958766106, CHAMFER1_SIZE * 0.999621916911), (0, 0), align=None)
    chamfer1_piece_39a = extrude(amount=8.128673195, mode=Mode.PRIVATE)
    chamfer1_piece_39a = split(chamfer1_piece_39a, bisect_by=Plane(origin=(76.589922843, -92.44777084, 14.868082549), z_dir=(1, 0, 0)), keep=Keep.TOP, mode=Mode.PRIVATE)
    with BuildSketch(Plane(origin=(76.589922843, -93.344526585, 15), x_dir=(0.9996219169112966, 0, 0.02749587661058671), z_dir=(0, 1, 0))) as chamfer1_piece_39b_section:
        Polygon((CHAMFER1_SIZE * 0.999621916911, CHAMFER1_SIZE * 0.0274958766106), (-CHAMFER1_SIZE * 0.0274958766106, CHAMFER1_SIZE * 0.999621916911), (0, 0), align=None)
    chamfer1_piece_39b = extrude(amount=3.55734639, mode=Mode.PRIVATE)
    chamfer1_piece_39b = split(chamfer1_piece_39b, bisect_by=Plane(origin=(76.721840294, -92.31585339, 14.868082549), z_dir=(0, -1, 0)), keep=Keep.TOP, mode=Mode.PRIVATE)
    chamfer1_piece_39 = chamfer1_piece_39a & chamfer1_piece_39b
    add(chamfer1_piece_39, mode=Mode.SUBTRACT)
    with BuildSketch(Plane(origin=(69.489922843, -85.21585339, 15), x_dir=(-0.9996219169112966, -2.1408261351483406e-13, 0.02749587661058671), z_dir=(0, -1, 0))) as chamfer1_piece_40a_section:
        Polygon((CHAMFER1_SIZE * 0.999621916911, CHAMFER1_SIZE * 0.0274958766106), (-CHAMFER1_SIZE * 0.0274958766106, CHAMFER1_SIZE * 0.999621916911), (0, 0), align=None)
    chamfer1_piece_40a = extrude(amount=8.128673195, mode=Mode.PRIVATE)
    chamfer1_piece_40a = split(chamfer1_piece_40a, bisect_by=Plane(origin=(69.358005392, -92.31585339, 14.868082549), z_dir=(0, -1, 0)), keep=Keep.TOP, mode=Mode.PRIVATE)
    with BuildSketch(Plane(origin=(68.461249648, -92.31585339, 15), x_dir=(0, -0.9996219169112966, 0.02749587661058671), z_dir=(1, 0, 0))) as chamfer1_piece_40b_section:
        Polygon((CHAMFER1_SIZE * 0.999621916911, CHAMFER1_SIZE * 0.0274958766106), (-CHAMFER1_SIZE * 0.0274958766106, CHAMFER1_SIZE * 0.999621916911), (0, 0), align=None)
    chamfer1_piece_40b = extrude(amount=8.128673195, mode=Mode.PRIVATE)
    chamfer1_piece_40b = split(chamfer1_piece_40b, bisect_by=Plane(origin=(69.489922843, -92.44777084, 14.868082549), z_dir=(-1, 0, 0)), keep=Keep.TOP, mode=Mode.PRIVATE)
    chamfer1_piece_40 = chamfer1_piece_40a & chamfer1_piece_40b
    add(chamfer1_piece_40, mode=Mode.SUBTRACT)
    with BuildSketch(Plane(origin=(72.018596038, -85.21585339, 15), x_dir=(0, 0.9996219169112966, 0.02749587661058671), z_dir=(-1, 0, 0))) as chamfer1_piece_41a_section:
        Polygon((CHAMFER1_SIZE * 0.999621916911, CHAMFER1_SIZE * 0.0274958766106), (-CHAMFER1_SIZE * 0.0274958766106, CHAMFER1_SIZE * 0.999621916911), (0, 0), align=None)
    chamfer1_piece_41a = extrude(amount=3.55734639, mode=Mode.PRIVATE)
    chamfer1_piece_41a = split(chamfer1_piece_41a, bisect_by=Plane(origin=(69.489922843, -85.083935939, 14.868082549), z_dir=(-1, 0, 0)), keep=Keep.TOP, mode=Mode.PRIVATE)
    with BuildSketch(Plane(origin=(69.489922843, -84.187180195, 15), x_dir=(-0.9996219169112966, -2.1408261351483406e-13, 0.02749587661058671), z_dir=(0, -1, 0))) as chamfer1_piece_41b_section:
        Polygon((CHAMFER1_SIZE * 0.999621916911, CHAMFER1_SIZE * 0.0274958766106), (-CHAMFER1_SIZE * 0.0274958766106, CHAMFER1_SIZE * 0.999621916911), (0, 0), align=None)
    chamfer1_piece_41b = extrude(amount=8.128673195, mode=Mode.PRIVATE)
    chamfer1_piece_41b = split(chamfer1_piece_41b, bisect_by=Plane(origin=(69.358005392, -85.21585339, 14.868082549), z_dir=(0, 1, 0)), keep=Keep.TOP, mode=Mode.PRIVATE)
    chamfer1_piece_41 = chamfer1_piece_41a & chamfer1_piece_41b
    add(chamfer1_piece_41, mode=Mode.SUBTRACT)
    with BuildSketch(Plane(origin=(69.489922843, -75.31575339, 15), x_dir=(-0.9996219169112966, 2.140826135148345e-13, 0.02749587661058671), z_dir=(0, -1, 0))) as chamfer1_piece_42a_section:
        Polygon((CHAMFER1_SIZE * 0.999621916911, CHAMFER1_SIZE * 0.0274958766106), (-CHAMFER1_SIZE * 0.0274958766106, CHAMFER1_SIZE * 0.999621916911), (0, 0), align=None)
    chamfer1_piece_42a = extrude(amount=5.128773195, mode=Mode.PRIVATE)
    chamfer1_piece_42a = split(chamfer1_piece_42a, bisect_by=Plane(origin=(69.358005392, -79.41585339, 14.868082549), z_dir=(0, -1, 0)), keep=Keep.TOP, mode=Mode.PRIVATE)
    with BuildSketch(Plane(origin=(68.461249648, -79.41585339, 15), x_dir=(0, -0.9996219169112966, 0.02749587661058671), z_dir=(1, 0, 0))) as chamfer1_piece_42b_section:
        Polygon((CHAMFER1_SIZE * 0.999621916911, CHAMFER1_SIZE * 0.0274958766106), (-CHAMFER1_SIZE * 0.0274958766106, CHAMFER1_SIZE * 0.999621916911), (0, 0), align=None)
    chamfer1_piece_42b = extrude(amount=3.55734639, mode=Mode.PRIVATE)
    chamfer1_piece_42b = split(chamfer1_piece_42b, bisect_by=Plane(origin=(69.489922843, -79.54777084, 14.868082549), z_dir=(-1, 0, 0)), keep=Keep.TOP, mode=Mode.PRIVATE)
    chamfer1_piece_42 = chamfer1_piece_42a & chamfer1_piece_42b
    add(chamfer1_piece_42, mode=Mode.SUBTRACT)


solid = part.part
